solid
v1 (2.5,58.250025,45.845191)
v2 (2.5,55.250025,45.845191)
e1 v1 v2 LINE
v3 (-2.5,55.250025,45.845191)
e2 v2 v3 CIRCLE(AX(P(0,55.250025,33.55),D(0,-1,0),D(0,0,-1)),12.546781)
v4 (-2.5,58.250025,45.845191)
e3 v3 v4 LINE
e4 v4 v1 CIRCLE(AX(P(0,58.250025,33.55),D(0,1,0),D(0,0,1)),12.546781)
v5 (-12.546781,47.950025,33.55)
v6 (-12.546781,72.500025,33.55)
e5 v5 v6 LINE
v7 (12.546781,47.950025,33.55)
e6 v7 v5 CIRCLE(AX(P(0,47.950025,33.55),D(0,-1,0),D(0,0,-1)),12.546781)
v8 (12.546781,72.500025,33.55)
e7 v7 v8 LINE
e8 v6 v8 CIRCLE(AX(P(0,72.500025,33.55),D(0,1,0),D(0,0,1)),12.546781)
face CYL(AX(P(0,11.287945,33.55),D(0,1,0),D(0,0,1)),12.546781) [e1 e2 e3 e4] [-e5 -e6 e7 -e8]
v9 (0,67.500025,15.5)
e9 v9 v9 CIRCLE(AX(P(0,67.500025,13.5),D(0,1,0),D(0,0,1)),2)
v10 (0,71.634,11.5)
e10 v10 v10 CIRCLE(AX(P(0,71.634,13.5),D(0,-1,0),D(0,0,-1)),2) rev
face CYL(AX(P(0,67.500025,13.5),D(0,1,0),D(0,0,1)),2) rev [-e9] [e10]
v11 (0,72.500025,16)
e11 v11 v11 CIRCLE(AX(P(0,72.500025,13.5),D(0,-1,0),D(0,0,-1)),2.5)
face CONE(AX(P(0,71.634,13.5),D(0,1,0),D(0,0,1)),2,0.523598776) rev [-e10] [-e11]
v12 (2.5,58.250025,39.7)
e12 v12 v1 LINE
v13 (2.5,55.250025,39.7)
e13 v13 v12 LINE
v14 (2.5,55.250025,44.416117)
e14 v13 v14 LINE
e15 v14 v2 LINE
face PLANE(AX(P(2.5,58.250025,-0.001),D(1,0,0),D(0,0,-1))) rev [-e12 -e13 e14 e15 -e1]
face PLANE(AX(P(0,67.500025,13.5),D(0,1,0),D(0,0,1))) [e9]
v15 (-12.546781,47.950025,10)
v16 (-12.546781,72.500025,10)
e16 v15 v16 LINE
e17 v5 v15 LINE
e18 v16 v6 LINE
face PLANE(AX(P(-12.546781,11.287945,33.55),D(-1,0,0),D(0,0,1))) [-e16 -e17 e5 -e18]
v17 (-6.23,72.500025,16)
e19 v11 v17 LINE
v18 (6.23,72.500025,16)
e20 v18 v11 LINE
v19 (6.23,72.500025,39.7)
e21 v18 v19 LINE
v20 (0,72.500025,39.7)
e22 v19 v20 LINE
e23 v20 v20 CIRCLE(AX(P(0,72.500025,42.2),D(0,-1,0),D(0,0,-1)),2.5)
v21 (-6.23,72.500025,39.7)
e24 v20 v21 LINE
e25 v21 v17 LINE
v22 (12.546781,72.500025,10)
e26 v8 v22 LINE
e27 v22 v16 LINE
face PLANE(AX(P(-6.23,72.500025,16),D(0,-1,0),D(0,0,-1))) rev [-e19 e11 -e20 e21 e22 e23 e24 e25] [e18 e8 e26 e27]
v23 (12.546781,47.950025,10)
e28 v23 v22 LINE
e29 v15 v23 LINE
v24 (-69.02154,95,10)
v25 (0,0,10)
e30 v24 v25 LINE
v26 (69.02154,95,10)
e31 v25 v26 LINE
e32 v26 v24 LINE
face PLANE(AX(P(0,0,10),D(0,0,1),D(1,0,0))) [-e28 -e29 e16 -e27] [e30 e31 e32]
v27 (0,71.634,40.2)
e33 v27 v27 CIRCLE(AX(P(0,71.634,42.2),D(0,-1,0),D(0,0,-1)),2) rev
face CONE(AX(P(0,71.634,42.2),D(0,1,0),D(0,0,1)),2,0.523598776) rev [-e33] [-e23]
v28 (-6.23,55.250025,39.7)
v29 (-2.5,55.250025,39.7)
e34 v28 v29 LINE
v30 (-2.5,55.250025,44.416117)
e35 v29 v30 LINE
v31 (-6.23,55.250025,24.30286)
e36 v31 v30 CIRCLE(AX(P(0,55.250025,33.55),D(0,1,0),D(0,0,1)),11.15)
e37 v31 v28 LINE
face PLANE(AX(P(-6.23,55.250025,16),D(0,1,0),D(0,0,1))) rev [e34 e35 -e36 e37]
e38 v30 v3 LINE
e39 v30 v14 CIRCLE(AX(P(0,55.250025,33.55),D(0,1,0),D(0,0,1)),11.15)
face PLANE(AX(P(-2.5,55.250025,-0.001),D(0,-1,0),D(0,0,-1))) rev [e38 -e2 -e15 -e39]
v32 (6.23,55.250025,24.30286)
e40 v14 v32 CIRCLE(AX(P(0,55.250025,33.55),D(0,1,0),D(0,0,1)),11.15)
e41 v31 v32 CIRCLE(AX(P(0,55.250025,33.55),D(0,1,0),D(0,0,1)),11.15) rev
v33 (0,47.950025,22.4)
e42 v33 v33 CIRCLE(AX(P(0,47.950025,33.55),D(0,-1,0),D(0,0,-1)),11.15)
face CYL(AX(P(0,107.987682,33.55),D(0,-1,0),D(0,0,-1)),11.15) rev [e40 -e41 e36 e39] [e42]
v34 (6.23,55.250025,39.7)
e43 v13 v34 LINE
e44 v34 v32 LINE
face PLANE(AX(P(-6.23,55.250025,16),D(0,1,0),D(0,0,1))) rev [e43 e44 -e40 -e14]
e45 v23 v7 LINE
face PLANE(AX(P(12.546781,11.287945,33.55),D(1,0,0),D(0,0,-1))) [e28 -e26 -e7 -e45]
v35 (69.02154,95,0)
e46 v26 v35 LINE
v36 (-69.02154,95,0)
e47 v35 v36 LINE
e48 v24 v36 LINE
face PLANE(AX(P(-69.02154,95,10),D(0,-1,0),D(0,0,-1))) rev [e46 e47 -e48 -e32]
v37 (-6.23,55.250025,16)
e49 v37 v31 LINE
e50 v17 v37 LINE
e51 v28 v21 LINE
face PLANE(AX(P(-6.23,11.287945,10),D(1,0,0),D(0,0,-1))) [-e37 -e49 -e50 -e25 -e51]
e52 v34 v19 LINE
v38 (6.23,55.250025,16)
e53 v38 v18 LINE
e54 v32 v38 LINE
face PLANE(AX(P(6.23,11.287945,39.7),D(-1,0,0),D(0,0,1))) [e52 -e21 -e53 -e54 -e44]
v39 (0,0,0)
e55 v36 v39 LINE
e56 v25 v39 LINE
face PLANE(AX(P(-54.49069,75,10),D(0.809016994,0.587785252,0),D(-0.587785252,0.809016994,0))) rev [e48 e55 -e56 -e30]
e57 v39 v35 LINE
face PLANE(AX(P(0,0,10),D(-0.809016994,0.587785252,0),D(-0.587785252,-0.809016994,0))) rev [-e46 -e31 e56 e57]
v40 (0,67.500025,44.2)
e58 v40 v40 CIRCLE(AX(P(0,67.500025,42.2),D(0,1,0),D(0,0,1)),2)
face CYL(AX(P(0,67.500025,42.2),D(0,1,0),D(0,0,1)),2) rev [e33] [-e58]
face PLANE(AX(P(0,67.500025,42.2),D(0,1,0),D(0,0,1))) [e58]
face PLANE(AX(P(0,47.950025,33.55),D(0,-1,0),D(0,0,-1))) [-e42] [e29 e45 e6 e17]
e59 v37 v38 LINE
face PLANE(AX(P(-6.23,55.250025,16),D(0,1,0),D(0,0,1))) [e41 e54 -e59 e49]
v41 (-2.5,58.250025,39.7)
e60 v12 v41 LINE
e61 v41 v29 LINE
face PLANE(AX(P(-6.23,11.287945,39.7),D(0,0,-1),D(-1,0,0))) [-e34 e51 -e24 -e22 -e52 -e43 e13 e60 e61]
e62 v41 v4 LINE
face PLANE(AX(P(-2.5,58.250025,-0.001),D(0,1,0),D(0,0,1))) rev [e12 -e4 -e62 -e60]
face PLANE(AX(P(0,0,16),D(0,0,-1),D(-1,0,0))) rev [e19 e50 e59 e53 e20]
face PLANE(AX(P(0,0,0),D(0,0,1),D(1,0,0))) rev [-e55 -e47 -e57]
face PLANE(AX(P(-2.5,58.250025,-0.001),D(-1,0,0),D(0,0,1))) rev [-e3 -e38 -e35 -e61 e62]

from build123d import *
from OCP.BRepFilletAPI import BRepFilletAPI_MakeChamfer

# Parameters (mm, degrees)
BOSS_EXTRUDE1_DEPTH      = 10
SKETCH4_W                = 12.46
SKETCH4_H                = 17.25
BOSS_EXTRUDE3_DEPTH      = 6
BOSS_EXTRUDE6_DEPTH      = 7.3
BOSS_EXTRUDE6_DEPTH_BACK = 17.25
SKETCH8_R                = 12.546781182
SKETCH8_R_2              = 11.15
BOSS_EXTRUDE4_DEPTH      = 17.25
SKETCH6_R                = 2
CUT_EXTRUDE1_DEPTH       = 5
CHAMFER1_SIZE            = 0.5
CHAMFER1_SIZE_2          = 0.866025404
BOSS_EXTRUDE2_DEPTH      = 10
SKETCH10_W               = 12.46
SKETCH10_H               = 23.7
CUT_EXTRUDE3_DEPTH       = 17.25
CUT_EXTRUDE4_REACH       = 128.15
SKETCH11_W               = 5
SKETCH11_H               = 3
BOSS_EXTRUDE7_START      = -7.3
BOSS_EXTRUDE7_DEPTH      = 7.3


with BuildPart() as part:
    # Sketch1 → Boss-Extrude1 (new body)
    with BuildSketch(Plane.XY):
        Polygon((0, 0), (54.4906896, 75), (-54.4906896, 75), align=None)
    extrude(amount=BOSS_EXTRUDE1_DEPTH)

    # Sketch4 → Boss-Extrude3 (add)
    with BuildSketch(Plane.XY.offset(10)):
        with Locations((0, 63.875025481)):
            Rectangle(SKETCH4_W, SKETCH4_H)
    extrude(amount=BOSS_EXTRUDE3_DEPTH)



with BuildPart() as body_2:
    # Sketch8 → Boss-Extrude6 (new, two sides: drawn at the far end of the back side and taken through both)
    with BuildSketch(Plane(origin=(0, 55.250025481, 0), x_dir=(-1, 0, 0), z_dir=(0, -1, 0)).offset(-BOSS_EXTRUDE6_DEPTH_BACK)):
        with Locations(Location((0, -33.55, 0), (0, 0, 90))):
            Circle(SKETCH8_R)
        with Locations(Location((0, -33.55, 0), (0, 0, 90))):
            Circle(SKETCH8_R_2, mode=Mode.SUBTRACT)
    extrude(amount=BOSS_EXTRUDE6_DEPTH + BOSS_EXTRUDE6_DEPTH_BACK)


with BuildPart() as part_1:
    add(part.part)

    add(body_2.part)  # Boss-Extrude4 merges body 2
    # Sketch5 → Boss-Extrude4 (add)
    with BuildSketch(Plane(origin=(0, 72.500025481, 0), x_dir=(1, 0, 0), z_dir=(0, 1, 0))):
        with BuildLine():
            Line((12.546781182, -33.55), (12.546781182, -10))
            Line((12.546781182, -10), (6.23, -10))
            Line((6.23, -10), (6.23, -39.7))
            Line((6.23, -39.7), (-6.23, -39.7))
            Line((-6.23, -39.7), (-6.23, -10))
            Line((-6.23, -10), (-12.546781182, -10))
            Line((-12.546781182, -10), (-12.546781182, -33.55))
            ThreePointArc((-12.546781182, -33.55), (0, -46.096781182), (12.546781182, -33.55))
        make_face()
    extrude(amount=-BOSS_EXTRUDE4_DEPTH)

    # Sketch6 → Cut-Extrude1 (cut)
    with BuildSketch(Plane(origin=(0, 72.500025481, 0), x_dir=(1, 0, 0), z_dir=(0, 1, 0))):
        with Locations(Location((0, -13.5, 0), (0, 0, 270))):
            Circle(SKETCH6_R)
        with Locations(Location((0, -42.2, 0), (0, 0, 270))):
            Circle(SKETCH6_R)
    extrude(amount=-CUT_EXTRUDE1_DEPTH, mode=Mode.SUBTRACT)

    # Chamfer1
    chamfer1_edges_1 = [part_1.edges().sort_by_distance(p)[0] for p in [
        (0, 72.500025481, 11.5),
    ]]
    chamfer1_side_1 = [part_1.faces().sort_by_distance(p)[0] for p in [
        (0, 72.500025481, 11.49),
    ]]
    chamfer1_edges_2 = [part_1.edges().sort_by_distance(p)[0] for p in [
        (0, 72.500025481, 40.2),
    ]]
    chamfer1_side_2 = [part_1.faces().sort_by_distance(p)[0] for p in [
        (0, 72.500025481, 40.19),
    ]]
    chamfer1 = BRepFilletAPI_MakeChamfer(part_1.part.solid().wrapped)
    for e in chamfer1_edges_1:
        chamfer1.Add(CHAMFER1_SIZE - 0.0001, CHAMFER1_SIZE_2 - 0.0001, e.wrapped, chamfer1_side_1[0].wrapped)
    for e in chamfer1_edges_2:
        chamfer1.Add(CHAMFER1_SIZE - 0.0001, CHAMFER1_SIZE_2 - 0.0001, e.wrapped, chamfer1_side_2[0].wrapped)
    add(Compound.cast(chamfer1.Shape()), mode=Mode.REPLACE)  # a hair under: the kernel refuses the full size

    # Sketch2 → Boss-Extrude2 (add)
    with BuildSketch(Plane.XY):
        Polygon((-54.4906896, 75), (-69.021540161, 95), (69.021540161, 95), (54.4906896, 75), align=None)
    extrude(amount=BOSS_EXTRUDE2_DEPTH)

    # Sketch10 → Cut-Extrude3 (cut)
    with BuildSketch(Plane(origin=(0, 72.500025481, 0), x_dir=(1, 0, 0), z_dir=(0, 1, 0))):
        with Locations((0, -27.85)):
            Rectangle(SKETCH10_W, SKETCH10_H)
    extrude(amount=-CUT_EXTRUDE3_DEPTH, mode=Mode.SUBTRACT)

    # Sketch11 → Cut-Extrude4 (cut, up to next)
    with BuildSketch(Plane.XY.offset(46.096781182), mode=Mode.PRIVATE) as cut_extrude4_sk1:
        with Locations((0, 56.750025481)):
            Rectangle(SKETCH11_W, SKETCH11_H)
    cut_extrude4_tool1 = extrude(cut_extrude4_sk1.sketch, amount=-CUT_EXTRUDE4_REACH, mode=Mode.PRIVATE) & part_1.part
    add(cut_extrude4_tool1.solids().sort_by_distance((0, 56.750025, 46.096781))[0], mode=Mode.SUBTRACT)

    # Sketch13 → Boss-Extrude7 (add)
    with BuildSketch(Plane.XZ.offset(-47.950025481).offset(BOSS_EXTRUDE7_START)):
        with BuildLine():
            Line((-12.546781182, 33.55), (-12.546781182, 10))
            Line((-12.546781182, 10), (12.546781182, 10))
            Line((12.546781182, 10), (12.546781182, 33.55))
            ThreePointArc((12.546781182, 33.55), (0, 21.003218818), (-12.546781182, 33.55))
        make_face()
    extrude(amount=BOSS_EXTRUDE7_DEPTH)


solid = part_1.part
